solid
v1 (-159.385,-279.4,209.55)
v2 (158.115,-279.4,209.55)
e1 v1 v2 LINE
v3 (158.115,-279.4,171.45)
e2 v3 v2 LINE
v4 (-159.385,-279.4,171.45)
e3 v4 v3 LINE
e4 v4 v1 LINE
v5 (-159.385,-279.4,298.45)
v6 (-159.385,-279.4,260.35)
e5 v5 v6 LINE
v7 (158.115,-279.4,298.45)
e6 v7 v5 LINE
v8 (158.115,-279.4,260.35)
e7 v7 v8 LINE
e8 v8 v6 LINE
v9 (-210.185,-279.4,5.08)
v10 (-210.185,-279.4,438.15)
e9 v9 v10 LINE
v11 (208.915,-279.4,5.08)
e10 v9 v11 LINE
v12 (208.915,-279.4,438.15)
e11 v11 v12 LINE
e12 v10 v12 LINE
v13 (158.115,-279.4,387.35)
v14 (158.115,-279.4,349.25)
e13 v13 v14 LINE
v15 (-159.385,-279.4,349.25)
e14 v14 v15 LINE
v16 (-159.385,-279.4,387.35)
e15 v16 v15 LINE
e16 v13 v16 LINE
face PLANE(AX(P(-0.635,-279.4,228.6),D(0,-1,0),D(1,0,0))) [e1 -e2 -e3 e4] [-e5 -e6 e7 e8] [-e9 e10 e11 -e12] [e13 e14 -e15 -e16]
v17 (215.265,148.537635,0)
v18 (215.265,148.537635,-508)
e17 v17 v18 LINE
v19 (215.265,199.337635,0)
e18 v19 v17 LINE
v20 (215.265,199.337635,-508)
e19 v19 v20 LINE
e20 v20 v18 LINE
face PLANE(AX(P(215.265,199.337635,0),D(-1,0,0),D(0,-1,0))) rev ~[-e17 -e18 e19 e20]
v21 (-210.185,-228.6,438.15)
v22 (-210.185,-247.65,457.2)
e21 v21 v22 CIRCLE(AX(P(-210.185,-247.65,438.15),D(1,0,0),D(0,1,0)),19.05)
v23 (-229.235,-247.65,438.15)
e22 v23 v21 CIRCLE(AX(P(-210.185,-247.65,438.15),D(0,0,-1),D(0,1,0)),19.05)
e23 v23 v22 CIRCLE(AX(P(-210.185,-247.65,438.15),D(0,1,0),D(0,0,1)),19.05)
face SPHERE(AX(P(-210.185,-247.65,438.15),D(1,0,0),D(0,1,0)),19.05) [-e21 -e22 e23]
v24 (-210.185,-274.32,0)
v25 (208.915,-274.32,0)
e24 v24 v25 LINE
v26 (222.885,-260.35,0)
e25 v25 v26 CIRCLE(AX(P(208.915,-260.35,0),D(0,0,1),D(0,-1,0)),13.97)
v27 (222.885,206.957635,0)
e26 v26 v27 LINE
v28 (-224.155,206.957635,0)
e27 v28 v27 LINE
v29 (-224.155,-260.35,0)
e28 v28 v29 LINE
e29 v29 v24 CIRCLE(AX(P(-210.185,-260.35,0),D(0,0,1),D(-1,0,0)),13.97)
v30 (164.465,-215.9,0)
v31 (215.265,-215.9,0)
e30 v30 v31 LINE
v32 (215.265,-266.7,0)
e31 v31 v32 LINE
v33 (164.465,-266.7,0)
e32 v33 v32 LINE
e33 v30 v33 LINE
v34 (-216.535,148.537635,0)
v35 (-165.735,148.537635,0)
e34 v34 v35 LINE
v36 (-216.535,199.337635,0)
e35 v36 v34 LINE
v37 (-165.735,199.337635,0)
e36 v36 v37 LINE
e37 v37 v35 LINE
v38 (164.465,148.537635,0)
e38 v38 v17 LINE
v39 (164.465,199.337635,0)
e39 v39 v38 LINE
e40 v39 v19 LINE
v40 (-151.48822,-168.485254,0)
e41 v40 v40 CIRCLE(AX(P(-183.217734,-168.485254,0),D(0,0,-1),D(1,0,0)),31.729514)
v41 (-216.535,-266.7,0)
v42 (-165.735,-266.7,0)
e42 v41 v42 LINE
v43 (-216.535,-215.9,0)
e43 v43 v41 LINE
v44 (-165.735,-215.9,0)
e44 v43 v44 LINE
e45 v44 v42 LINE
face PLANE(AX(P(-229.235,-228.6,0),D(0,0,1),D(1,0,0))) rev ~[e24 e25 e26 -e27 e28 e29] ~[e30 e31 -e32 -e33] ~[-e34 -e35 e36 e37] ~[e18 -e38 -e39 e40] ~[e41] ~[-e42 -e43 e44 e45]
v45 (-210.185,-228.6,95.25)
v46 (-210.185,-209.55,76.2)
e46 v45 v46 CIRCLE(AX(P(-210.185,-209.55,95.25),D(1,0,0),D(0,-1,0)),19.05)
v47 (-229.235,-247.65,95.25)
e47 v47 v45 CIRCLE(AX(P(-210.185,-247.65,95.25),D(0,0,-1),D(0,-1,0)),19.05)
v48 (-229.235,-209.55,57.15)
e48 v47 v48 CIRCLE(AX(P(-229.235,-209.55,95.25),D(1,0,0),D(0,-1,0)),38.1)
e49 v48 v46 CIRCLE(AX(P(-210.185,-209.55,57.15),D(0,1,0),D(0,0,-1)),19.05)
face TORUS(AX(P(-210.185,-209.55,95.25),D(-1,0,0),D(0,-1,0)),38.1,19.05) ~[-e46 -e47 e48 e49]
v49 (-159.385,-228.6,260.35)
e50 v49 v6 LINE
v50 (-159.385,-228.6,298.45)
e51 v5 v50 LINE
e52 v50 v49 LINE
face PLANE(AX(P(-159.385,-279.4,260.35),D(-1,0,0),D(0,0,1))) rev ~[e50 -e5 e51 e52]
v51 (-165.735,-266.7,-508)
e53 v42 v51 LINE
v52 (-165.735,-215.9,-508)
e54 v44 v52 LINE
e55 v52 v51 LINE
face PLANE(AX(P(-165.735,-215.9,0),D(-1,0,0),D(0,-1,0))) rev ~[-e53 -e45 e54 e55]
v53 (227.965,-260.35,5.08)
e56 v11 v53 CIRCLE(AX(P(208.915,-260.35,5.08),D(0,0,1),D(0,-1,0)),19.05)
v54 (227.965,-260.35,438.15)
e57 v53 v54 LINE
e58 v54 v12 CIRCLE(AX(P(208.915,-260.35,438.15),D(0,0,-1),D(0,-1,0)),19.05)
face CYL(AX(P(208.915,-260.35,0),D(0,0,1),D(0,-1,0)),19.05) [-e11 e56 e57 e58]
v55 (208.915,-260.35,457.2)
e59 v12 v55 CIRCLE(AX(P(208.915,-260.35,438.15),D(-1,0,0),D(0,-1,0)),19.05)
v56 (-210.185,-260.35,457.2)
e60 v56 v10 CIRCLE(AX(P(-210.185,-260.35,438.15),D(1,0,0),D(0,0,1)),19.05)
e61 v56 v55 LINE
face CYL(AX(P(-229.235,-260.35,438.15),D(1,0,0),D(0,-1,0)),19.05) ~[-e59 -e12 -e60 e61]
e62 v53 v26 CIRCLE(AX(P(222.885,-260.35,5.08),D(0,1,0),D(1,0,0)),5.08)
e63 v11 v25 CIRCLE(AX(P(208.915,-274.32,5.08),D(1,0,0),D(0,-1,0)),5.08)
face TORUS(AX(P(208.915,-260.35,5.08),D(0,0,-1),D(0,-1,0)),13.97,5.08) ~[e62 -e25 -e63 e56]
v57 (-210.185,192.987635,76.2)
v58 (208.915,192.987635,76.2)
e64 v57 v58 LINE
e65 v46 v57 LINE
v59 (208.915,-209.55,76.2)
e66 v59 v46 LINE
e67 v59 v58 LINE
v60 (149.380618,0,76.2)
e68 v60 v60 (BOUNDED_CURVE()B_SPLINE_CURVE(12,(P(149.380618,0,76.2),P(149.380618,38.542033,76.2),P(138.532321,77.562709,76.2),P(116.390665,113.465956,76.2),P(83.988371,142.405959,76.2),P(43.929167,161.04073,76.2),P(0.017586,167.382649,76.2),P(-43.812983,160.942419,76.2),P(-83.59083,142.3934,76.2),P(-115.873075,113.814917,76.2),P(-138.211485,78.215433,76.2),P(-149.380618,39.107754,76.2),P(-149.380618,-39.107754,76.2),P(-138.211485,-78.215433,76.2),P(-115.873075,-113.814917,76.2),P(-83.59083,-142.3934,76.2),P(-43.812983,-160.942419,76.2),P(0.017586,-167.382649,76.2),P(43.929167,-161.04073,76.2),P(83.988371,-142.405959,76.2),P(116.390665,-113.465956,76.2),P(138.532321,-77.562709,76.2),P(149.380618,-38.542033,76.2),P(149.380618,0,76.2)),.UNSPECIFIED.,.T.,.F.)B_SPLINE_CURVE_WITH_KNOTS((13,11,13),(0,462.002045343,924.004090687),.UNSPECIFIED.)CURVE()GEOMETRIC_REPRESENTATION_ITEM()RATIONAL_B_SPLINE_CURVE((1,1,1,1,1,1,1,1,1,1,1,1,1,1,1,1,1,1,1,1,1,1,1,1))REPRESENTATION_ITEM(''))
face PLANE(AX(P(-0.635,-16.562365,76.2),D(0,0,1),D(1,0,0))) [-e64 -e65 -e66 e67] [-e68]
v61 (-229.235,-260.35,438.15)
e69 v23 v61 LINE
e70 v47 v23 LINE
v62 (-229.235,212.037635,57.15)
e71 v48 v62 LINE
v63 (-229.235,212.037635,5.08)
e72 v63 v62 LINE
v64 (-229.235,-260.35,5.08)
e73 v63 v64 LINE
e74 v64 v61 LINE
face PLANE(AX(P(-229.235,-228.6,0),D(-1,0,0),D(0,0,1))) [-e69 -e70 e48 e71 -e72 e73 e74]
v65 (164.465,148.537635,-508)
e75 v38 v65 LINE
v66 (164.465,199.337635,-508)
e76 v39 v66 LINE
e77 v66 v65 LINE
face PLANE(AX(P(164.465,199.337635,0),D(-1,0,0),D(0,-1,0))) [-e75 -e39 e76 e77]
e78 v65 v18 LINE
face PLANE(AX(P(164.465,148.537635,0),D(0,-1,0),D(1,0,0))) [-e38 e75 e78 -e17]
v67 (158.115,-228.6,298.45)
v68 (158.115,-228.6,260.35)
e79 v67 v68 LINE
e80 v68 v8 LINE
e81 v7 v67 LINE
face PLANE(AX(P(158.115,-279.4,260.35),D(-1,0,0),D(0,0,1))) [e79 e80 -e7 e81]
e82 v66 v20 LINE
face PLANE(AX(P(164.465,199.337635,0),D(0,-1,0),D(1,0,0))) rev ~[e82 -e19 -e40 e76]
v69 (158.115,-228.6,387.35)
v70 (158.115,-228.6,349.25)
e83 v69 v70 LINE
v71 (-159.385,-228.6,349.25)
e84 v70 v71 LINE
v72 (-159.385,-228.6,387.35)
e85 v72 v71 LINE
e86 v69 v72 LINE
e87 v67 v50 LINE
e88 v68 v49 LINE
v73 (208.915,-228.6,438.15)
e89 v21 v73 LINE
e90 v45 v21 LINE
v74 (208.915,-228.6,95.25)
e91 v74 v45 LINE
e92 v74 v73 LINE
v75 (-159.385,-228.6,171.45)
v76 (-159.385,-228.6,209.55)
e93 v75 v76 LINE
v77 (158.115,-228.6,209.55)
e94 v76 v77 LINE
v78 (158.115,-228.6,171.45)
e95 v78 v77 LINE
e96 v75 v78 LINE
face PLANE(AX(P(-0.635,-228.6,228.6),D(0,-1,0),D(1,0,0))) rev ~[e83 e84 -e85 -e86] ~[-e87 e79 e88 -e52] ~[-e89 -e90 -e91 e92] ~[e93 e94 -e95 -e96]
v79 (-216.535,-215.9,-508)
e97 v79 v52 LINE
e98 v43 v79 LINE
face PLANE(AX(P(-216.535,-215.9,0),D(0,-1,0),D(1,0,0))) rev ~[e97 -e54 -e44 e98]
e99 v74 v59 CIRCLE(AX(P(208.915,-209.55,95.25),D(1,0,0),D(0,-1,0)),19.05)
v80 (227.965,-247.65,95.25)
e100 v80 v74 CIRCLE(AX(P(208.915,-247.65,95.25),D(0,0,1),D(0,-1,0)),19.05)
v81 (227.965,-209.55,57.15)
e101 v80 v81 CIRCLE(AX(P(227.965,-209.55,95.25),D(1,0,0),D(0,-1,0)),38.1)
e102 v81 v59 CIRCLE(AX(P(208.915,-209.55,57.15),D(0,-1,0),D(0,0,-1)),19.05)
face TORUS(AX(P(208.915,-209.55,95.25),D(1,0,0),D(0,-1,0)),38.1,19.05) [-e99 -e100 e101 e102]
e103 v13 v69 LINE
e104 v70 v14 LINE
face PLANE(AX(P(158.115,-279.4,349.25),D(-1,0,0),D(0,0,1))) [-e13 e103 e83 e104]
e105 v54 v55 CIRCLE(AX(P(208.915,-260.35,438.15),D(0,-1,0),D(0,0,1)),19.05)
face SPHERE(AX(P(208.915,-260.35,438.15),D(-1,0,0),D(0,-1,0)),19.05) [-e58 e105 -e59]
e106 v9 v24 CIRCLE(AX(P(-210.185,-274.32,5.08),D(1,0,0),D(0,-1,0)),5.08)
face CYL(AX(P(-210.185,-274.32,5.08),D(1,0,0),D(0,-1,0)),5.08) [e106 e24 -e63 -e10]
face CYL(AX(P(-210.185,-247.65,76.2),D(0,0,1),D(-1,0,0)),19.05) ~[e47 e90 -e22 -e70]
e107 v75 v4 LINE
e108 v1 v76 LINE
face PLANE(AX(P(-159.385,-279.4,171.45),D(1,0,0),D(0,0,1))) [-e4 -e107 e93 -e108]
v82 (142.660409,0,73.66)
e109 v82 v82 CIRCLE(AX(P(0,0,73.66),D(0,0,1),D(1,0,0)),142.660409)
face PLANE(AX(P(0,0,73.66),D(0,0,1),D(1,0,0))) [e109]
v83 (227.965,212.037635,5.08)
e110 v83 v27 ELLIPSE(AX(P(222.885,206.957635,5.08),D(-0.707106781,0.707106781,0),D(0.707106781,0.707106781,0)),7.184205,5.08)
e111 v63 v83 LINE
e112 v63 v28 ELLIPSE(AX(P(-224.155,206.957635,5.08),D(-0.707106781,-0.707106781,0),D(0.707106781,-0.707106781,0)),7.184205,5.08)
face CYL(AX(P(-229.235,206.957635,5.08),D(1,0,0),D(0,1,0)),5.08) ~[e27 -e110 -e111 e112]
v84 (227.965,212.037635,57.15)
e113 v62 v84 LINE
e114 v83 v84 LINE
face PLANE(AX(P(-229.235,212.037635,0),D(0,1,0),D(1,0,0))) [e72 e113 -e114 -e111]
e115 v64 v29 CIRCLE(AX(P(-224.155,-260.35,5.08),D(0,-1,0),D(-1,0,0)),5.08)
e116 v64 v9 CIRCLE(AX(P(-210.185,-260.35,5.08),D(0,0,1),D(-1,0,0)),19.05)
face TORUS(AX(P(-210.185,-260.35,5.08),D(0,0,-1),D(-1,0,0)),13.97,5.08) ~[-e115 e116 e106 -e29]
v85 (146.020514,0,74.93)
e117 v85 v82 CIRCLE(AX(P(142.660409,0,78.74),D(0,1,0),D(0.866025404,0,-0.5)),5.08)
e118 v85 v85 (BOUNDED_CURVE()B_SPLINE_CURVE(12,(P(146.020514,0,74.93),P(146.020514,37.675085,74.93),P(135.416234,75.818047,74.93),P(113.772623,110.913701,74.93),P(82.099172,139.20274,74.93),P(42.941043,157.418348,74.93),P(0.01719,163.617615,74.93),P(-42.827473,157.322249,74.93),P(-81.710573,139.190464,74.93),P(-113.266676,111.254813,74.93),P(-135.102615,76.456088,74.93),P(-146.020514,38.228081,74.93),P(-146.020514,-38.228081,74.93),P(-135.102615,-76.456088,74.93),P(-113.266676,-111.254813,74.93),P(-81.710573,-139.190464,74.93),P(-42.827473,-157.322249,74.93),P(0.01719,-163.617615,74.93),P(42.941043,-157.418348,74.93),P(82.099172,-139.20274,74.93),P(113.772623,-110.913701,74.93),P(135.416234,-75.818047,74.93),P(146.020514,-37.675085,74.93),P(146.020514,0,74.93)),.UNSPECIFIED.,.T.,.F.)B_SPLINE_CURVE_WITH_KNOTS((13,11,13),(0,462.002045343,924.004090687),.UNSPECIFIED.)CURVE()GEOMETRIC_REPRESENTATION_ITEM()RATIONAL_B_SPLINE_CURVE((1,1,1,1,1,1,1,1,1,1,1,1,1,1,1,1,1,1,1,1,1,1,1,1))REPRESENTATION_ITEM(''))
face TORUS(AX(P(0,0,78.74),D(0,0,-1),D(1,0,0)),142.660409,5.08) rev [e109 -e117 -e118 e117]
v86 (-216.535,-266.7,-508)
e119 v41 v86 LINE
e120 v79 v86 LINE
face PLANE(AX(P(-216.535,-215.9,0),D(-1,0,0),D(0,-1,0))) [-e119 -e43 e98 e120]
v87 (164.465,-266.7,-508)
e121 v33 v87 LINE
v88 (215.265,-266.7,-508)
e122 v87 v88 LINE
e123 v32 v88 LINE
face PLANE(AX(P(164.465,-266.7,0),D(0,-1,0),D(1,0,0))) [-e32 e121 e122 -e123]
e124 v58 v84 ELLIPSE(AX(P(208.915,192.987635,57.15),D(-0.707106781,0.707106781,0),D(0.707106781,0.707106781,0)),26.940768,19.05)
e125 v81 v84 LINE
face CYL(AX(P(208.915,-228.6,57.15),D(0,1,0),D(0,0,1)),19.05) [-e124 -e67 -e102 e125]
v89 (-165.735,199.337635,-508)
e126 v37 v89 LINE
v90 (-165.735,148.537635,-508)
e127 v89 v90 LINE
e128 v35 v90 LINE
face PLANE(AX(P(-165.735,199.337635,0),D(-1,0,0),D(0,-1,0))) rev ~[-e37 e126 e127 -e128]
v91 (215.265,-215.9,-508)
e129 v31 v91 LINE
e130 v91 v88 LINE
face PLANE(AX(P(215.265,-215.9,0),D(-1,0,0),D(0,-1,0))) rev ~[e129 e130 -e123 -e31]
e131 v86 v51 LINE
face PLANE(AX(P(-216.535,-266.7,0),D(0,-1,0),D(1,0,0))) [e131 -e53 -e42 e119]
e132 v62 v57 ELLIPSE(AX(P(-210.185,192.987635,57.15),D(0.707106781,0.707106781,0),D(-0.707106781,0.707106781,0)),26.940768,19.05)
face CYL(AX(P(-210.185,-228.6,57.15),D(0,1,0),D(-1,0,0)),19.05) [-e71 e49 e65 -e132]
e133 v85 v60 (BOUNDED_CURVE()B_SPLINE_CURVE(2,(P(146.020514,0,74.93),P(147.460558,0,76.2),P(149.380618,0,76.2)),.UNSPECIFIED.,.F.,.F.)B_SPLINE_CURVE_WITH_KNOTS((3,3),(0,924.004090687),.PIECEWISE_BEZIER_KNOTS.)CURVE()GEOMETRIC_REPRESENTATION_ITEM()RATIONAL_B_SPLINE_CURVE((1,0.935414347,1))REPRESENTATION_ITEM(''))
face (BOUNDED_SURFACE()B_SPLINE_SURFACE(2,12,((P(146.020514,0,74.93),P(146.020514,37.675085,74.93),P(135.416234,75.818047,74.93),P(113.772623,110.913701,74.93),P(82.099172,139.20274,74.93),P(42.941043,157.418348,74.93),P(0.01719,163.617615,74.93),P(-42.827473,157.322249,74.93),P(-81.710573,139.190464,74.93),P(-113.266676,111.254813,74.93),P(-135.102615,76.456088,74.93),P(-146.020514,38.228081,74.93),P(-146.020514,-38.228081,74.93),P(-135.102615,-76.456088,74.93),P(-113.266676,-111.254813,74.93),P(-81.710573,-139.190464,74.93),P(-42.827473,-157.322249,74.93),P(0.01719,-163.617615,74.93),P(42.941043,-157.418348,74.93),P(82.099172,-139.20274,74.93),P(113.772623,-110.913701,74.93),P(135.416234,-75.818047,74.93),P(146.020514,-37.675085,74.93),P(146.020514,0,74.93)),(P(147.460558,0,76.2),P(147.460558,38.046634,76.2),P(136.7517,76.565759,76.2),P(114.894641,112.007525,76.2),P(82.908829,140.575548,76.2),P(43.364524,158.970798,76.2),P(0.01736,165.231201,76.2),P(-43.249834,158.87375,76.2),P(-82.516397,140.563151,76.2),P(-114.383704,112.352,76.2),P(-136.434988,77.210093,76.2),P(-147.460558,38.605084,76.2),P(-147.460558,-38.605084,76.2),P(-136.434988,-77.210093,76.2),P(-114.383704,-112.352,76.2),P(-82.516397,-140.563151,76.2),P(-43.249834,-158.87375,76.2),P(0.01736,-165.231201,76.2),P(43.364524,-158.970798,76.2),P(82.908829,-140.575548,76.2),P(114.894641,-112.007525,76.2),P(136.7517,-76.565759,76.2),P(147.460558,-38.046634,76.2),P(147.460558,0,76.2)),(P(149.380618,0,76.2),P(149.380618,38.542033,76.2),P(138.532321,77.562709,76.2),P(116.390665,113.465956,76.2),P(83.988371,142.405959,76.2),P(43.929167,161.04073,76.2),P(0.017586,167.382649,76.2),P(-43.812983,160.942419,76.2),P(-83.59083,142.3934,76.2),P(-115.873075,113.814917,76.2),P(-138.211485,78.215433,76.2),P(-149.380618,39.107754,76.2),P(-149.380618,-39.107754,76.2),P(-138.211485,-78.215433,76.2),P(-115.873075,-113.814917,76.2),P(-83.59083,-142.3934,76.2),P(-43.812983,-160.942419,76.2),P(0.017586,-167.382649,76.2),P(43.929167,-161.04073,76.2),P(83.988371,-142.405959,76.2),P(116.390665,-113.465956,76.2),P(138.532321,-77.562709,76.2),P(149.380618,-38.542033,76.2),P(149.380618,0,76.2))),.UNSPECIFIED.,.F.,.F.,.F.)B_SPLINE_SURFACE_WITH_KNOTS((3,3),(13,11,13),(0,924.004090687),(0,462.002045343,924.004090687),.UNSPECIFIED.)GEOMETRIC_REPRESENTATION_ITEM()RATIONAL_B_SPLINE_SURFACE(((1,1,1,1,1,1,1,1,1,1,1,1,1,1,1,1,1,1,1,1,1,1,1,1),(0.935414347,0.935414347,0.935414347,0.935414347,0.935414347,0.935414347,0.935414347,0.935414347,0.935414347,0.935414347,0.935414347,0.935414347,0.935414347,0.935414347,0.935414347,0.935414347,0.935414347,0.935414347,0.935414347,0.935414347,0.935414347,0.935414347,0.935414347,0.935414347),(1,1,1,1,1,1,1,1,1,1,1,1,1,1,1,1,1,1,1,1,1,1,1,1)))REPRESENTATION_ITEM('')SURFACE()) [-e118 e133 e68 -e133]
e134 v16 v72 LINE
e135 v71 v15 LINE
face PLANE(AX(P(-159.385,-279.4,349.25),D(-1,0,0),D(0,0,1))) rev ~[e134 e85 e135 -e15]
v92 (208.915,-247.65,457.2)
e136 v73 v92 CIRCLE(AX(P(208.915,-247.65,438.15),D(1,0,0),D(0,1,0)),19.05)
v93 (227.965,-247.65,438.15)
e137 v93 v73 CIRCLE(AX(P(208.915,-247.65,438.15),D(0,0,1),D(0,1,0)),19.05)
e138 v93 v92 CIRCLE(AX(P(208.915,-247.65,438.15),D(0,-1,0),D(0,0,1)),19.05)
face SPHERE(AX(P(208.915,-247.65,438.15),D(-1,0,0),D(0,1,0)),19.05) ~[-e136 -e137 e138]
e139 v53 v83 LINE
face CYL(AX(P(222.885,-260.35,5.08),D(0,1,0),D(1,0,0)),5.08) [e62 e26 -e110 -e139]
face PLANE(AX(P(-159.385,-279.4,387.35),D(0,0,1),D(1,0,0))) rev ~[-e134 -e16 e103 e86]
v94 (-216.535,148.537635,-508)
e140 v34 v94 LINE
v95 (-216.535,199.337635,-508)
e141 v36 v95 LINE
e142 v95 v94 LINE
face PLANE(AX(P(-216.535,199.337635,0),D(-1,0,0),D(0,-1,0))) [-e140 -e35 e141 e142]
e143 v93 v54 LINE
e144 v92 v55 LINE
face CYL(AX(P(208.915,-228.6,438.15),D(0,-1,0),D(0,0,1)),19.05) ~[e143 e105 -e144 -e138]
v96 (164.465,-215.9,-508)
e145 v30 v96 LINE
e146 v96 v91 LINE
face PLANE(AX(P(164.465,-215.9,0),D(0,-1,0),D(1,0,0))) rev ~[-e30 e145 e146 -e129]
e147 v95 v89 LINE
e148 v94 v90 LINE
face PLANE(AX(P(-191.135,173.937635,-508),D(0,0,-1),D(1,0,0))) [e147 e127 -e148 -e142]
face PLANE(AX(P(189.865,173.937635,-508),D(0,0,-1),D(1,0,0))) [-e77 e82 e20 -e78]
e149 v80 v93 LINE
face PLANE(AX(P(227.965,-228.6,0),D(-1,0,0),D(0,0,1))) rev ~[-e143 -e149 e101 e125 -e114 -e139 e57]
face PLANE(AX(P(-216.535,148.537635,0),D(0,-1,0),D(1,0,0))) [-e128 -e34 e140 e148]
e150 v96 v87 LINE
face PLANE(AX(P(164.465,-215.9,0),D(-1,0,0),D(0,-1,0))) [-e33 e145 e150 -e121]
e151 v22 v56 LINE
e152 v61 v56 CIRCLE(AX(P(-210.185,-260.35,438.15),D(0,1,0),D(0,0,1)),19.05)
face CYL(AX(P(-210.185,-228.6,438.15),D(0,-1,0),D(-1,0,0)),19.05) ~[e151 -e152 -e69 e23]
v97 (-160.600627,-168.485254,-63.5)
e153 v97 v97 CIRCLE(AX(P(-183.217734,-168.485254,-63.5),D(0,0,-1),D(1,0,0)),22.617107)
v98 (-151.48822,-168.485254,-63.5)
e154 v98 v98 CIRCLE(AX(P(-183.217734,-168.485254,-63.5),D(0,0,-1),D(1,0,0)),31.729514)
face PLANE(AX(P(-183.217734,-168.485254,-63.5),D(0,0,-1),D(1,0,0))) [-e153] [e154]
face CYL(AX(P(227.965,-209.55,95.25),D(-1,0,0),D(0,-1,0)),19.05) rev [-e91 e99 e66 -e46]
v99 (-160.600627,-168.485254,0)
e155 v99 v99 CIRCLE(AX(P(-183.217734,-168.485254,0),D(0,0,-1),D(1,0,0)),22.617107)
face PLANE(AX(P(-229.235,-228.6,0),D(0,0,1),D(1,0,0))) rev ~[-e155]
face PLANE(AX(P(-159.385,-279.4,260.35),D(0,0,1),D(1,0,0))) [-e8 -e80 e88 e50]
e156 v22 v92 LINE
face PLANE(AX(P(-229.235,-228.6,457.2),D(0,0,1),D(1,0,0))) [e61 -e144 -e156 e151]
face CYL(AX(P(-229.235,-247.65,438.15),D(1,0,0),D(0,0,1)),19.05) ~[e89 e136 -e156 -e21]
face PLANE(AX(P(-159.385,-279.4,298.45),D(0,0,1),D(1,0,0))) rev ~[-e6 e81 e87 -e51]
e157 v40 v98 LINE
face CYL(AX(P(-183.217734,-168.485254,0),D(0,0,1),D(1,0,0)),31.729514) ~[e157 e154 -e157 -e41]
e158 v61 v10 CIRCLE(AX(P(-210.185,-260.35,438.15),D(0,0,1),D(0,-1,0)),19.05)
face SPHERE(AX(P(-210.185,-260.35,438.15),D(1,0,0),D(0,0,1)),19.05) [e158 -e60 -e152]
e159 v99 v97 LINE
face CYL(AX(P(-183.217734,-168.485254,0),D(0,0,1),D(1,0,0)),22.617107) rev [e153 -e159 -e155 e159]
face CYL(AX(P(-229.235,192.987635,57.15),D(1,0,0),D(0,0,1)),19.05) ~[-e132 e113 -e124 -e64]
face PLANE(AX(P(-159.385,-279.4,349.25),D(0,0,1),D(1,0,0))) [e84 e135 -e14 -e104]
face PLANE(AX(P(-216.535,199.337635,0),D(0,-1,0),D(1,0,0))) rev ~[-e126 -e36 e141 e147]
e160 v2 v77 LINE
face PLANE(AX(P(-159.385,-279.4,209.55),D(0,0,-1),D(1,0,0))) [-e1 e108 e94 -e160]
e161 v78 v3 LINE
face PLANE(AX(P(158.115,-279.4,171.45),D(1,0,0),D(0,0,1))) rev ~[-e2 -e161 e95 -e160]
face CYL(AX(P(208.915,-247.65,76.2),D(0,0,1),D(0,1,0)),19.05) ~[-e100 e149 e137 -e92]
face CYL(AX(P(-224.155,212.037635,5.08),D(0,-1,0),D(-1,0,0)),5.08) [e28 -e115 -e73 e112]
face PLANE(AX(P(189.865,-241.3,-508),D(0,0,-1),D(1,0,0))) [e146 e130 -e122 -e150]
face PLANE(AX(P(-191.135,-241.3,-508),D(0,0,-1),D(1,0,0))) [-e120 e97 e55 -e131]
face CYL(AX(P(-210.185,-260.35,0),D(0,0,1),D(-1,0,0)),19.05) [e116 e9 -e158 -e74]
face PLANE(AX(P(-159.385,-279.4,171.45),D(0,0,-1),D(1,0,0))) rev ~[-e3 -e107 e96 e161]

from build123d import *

# Parameters (mm, degrees)
F2_W      = 457.2
F2_H      = 457.2
F3_DEPTH  = 50.8
F0_W      = 457.2
F0_H      = 457.2
F4_DEPTH  = 76.2
F5_W      = 50.8
F5_H      = 50.8
F6_DEPTH  = 508
F7_R      = 19.05
F8_W      = 317.5
F8_H      = 38.1
F9_DEPTH  = 63.5
F10_R     = 31.7295136587
F10_R_2   = 22.617106641
F11_DEPTH = 63.5
F12_R     = 147.0598184699
F13_DEPTH = 2.54
F15_R     = 5.08
F16_R     = 5.08


# Not quite as in the source:
# - a fillet or chamfer that OpenCascade refuses, or shapes differently, is made with other operations: its cross-section is extruded or revolved along the edge and cut away or added


with BuildPart() as f3:
    # F2 (on offset) → F3 (new body)
    with BuildSketch(Plane.XZ.offset(228.6)):
        with Locations((-0.6349999458, 228.6)):
            Rectangle(F2_W, F2_H)
    extrude(amount=F3_DEPTH)

    # F0 (on Top) → F4 (join)
    with BuildSketch(Plane.XY):
        with Locations((-0.6349999458, -16.5623649633)):
            Rectangle(F0_W, F0_H)
    extrude(amount=F4_DEPTH)

    # F5 (on face) → F6 (join)
    with BuildSketch(Plane(origin=(0, 0, 0), x_dir=(1, 0, 0), z_dir=(0, 0, -1))):
        with Locations((-191.1349999458, 241.3)):
            Rectangle(F5_W, F5_H)
        with Locations((189.8650000542, 241.3)):
            Rectangle(F5_W, F5_H)
        with Locations((189.8650000542, -173.9376350367)):
            Rectangle(F5_W, F5_H)
        with Locations((-191.1349999458, -173.9376350367)):
            Rectangle(F5_W, F5_H)
    extrude(amount=F6_DEPTH)

    # F7
    f7_edges = [f3.edges().sort_by_distance(p)[0] for p in [
        (-0.635, -228.6, 76.2),
        (-0.635, -228.6, 457.2),
        (-229.235, -228.6, 266.7),
        (227.965, -228.6, 266.7),
        (-0.635, -279.4, 457.2),
        (227.965, -279.4, 228.6),
        (227.965, -254, 457.2),
        (-229.235, -254, 457.2),
        (-229.235, -8.281182, 76.2),
        (227.965, -8.281182, 76.2),
        (-0.635, 212.037635, 76.2),
        (-229.235, -279.4, 228.6),
    ]]
    fillet(f7_edges, radius=F7_R)

    # F8 (on face) → F9 (cut, symmetric)
    with BuildSketch(Plane.XZ.offset(279.4)):
        with Locations((-0.6349999458, 368.3)):
            Rectangle(F8_W, F8_H)
        with Locations((-0.6349999458, 279.4)):
            Rectangle(F8_W, F8_H)
        with Locations((-0.6349999458, 190.5)):
            Rectangle(F8_W, F8_H)
    extrude(amount=F9_DEPTH, both=True, mode=Mode.SUBTRACT)

    # F10 (on face) → F11 (join)
    with BuildSketch(Plane(origin=(0, 0, 0), x_dir=(1, 0, 0), z_dir=(0, 0, -1))):
        with Locations((-183.2177340984, 168.4852540493)):
            Circle(F10_R)
        with Locations((-183.2177340984, 168.4852540493)):
            Circle(F10_R_2, mode=Mode.SUBTRACT)
    extrude(amount=F11_DEPTH)

    # F12 (on face) → F13 (cut)
    with BuildSketch(Plane.XY.offset(76.2)):
        Circle(F12_R)
    extrude(amount=-F13_DEPTH, mode=Mode.SUBTRACT)

    # F14: fillet of radius 5.08 on 1 edges, made by hand

    # F14_s1 → F14_t2 (revolve)
    with BuildSketch(Plane.XZ):
        with BuildLine():
            ThreePointArc((147.0598184699, 76.2), (145.2004094187, 74.3405909488), (142.6604094187, 73.66))
            Line((142.6604094187, 73.66), (147.0598184699, 73.66))
            Line((147.0598184699, 73.66), (147.0598184699, 76.2))
        make_face()
    revolve(axis=Axis((0, 0, 73.66), (0, 0, 1)))

    # F15
    f15_edges = [f3.edges().sort_by_distance(p)[0] for p in [
        (-147.059818, 0, 76.2),
    ]]
    fillet(f15_edges, radius=F15_R)

    # F16
    f16_edges = [f3.edges().sort_by_distance(p)[0] for p in [
        (-229.235, -24.156182, 0),
        (-0.635, 212.037635, 0),
        (227.965, -24.156182, 0),
        (-0.635, -279.4, 0),
        (222.385384, -273.820384, 0),
        (-223.655384, -273.820384, 0),
    ]]
    fillet(f16_edges, radius=F16_R)


solid = f3.part
